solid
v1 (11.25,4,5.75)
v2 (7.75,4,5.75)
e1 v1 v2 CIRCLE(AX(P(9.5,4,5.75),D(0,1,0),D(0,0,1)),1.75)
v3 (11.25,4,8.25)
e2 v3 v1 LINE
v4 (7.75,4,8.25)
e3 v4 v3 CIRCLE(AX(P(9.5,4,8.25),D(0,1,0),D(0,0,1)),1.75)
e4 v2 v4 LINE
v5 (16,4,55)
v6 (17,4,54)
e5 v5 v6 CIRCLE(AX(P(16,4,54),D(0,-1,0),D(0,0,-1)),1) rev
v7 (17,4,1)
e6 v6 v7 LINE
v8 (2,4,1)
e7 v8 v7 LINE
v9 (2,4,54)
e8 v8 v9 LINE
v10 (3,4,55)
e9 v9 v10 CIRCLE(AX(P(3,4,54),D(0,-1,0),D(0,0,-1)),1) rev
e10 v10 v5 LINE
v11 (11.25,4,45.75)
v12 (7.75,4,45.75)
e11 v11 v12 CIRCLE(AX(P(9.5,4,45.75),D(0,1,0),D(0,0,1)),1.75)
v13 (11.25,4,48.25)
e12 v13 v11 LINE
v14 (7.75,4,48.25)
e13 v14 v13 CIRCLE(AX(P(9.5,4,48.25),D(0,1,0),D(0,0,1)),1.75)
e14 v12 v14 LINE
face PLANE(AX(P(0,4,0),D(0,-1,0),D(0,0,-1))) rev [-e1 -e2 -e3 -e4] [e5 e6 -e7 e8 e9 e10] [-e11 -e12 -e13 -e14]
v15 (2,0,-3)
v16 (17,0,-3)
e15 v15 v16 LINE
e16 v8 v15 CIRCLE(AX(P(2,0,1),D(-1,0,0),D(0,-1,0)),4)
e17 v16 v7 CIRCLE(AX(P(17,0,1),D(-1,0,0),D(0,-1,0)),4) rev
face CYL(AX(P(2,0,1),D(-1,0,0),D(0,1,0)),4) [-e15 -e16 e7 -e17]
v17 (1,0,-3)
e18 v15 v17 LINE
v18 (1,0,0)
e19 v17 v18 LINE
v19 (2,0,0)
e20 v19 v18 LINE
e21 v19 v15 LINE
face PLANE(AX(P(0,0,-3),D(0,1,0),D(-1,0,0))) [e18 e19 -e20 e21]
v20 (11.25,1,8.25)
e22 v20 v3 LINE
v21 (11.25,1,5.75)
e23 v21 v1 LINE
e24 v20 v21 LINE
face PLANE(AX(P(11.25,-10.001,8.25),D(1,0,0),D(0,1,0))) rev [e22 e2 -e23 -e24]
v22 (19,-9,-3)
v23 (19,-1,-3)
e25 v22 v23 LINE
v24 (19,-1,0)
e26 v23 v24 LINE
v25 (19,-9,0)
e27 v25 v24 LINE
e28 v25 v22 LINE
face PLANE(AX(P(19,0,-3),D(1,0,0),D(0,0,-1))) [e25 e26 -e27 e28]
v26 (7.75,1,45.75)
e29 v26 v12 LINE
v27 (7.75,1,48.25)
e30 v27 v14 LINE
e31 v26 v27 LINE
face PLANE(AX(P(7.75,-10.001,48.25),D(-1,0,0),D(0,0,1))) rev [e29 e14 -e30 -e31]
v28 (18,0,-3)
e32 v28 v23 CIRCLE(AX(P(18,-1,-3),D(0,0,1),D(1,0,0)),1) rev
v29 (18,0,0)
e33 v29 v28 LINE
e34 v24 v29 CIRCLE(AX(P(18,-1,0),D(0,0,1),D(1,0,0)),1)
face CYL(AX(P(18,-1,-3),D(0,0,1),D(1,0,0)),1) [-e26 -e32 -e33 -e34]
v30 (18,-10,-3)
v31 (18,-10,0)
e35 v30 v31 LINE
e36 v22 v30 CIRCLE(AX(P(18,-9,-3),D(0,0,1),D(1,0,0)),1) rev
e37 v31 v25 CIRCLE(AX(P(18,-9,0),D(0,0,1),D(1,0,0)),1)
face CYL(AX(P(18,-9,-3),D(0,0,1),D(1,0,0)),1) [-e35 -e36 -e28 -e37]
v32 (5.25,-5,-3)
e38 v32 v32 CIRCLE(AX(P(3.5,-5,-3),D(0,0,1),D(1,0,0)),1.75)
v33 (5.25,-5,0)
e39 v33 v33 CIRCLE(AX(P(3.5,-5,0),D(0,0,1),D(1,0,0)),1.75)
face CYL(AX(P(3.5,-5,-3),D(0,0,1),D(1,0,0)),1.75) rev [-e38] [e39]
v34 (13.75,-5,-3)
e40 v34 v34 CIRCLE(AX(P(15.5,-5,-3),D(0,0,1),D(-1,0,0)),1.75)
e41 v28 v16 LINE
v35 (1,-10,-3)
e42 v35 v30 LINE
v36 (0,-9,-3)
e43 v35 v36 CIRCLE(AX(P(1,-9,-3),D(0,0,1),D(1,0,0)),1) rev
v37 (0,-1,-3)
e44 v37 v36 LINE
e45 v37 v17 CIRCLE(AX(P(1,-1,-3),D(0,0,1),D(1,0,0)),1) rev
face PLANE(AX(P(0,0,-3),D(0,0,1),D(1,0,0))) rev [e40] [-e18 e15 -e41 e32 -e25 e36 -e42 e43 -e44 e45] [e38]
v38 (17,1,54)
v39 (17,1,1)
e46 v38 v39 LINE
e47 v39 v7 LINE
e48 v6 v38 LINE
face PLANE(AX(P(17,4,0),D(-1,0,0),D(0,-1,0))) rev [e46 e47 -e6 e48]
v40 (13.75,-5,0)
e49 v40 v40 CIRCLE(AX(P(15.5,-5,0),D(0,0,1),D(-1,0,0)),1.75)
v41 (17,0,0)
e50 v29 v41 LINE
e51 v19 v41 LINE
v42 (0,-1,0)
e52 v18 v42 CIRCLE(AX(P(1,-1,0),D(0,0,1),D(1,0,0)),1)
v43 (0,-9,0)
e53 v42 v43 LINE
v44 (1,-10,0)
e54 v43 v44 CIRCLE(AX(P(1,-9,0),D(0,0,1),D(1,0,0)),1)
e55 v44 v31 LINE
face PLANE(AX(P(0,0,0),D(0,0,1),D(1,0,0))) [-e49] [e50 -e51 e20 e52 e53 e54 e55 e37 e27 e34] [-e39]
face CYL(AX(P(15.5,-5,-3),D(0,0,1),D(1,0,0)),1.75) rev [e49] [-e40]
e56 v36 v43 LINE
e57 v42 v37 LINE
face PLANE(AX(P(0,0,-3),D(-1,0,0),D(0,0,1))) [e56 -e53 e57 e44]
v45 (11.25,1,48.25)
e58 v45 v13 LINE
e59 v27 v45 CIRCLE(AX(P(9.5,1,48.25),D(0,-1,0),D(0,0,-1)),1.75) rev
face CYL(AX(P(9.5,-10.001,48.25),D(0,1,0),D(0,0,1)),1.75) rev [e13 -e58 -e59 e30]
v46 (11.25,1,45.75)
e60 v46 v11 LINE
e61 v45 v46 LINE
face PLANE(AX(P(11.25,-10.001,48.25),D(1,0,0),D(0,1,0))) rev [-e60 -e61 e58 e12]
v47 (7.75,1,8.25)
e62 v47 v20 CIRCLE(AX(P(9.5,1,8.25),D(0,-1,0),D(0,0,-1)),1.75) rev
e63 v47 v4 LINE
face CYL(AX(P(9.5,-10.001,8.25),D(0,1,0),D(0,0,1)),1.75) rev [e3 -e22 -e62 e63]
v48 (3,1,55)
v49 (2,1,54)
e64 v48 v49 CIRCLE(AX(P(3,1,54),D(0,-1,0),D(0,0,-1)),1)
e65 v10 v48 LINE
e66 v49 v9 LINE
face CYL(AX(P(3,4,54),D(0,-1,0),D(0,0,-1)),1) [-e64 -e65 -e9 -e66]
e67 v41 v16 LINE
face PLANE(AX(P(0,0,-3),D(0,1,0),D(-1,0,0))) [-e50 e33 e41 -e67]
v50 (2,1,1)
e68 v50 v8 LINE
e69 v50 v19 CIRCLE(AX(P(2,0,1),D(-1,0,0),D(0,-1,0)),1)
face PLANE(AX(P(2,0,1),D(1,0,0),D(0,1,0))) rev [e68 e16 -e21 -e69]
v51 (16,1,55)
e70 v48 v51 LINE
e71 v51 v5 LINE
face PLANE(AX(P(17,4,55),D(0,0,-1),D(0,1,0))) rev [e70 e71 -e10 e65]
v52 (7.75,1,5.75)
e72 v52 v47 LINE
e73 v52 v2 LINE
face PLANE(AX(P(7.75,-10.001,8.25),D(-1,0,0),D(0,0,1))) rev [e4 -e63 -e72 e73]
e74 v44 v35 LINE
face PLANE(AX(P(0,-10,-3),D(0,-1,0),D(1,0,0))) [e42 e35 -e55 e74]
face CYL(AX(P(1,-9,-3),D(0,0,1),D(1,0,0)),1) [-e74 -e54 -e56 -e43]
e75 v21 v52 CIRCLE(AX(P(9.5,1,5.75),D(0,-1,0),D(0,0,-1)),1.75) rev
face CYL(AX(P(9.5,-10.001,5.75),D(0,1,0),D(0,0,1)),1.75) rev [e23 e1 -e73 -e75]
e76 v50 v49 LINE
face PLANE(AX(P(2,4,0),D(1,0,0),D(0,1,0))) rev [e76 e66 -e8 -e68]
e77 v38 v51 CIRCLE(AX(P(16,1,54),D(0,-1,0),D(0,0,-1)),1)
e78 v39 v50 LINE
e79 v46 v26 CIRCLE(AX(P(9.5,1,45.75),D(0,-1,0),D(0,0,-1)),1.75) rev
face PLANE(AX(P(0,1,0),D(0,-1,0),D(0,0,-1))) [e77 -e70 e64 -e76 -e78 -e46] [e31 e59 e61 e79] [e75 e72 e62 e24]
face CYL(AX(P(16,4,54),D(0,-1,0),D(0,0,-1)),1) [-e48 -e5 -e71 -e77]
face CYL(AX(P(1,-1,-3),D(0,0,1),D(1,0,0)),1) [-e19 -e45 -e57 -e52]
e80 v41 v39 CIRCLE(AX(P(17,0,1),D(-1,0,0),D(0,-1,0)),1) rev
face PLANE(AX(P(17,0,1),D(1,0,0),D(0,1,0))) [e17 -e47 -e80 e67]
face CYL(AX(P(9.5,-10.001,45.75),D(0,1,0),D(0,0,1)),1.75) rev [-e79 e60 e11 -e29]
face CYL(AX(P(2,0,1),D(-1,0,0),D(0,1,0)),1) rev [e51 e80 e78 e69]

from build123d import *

# Parameters (mm, degrees)
CROQUIS1_W             = 19
CROQUIS1_H             = 10
CROQUIS1_R             = 1.75
BRIDA_BASE1_DEPTH      = 3
BRIDA_DE_ARISTA1_DEPTH = 15
CORTAR_EXTRUIR1_REACH  = 61.85
REDONDEO1_R            = 1


# Sheet-metal steps are written as plain solids
with BuildPart() as part:
    # Croquis1 → Brida base1 (new body)
    with BuildSketch(Plane.XY):
        with Locations((9.5, -5)):
            Rectangle(CROQUIS1_W, CROQUIS1_H)
        with Locations((3.5, -5)):
            Circle(CROQUIS1_R, mode=Mode.SUBTRACT)
        with Locations(Location((15.5, -5, 0), (0, 0, 180))):
            Circle(CROQUIS1_R, mode=Mode.SUBTRACT)
    extrude(amount=-BRIDA_BASE1_DEPTH)

    # Brida de arista1 section (across the edge) → Brida de arista1 (add)
    with BuildSketch(Plane(origin=(17, 1, 0), x_dir=(0, -1, 0), z_dir=(-1, 0, 0))):
        with BuildLine():
            Line((-3, 1), (-3, 55))
            Line((-3, 55), (0, 55))
            Line((0, 55), (0, 1))
            ThreePointArc((0, 1), (0.292893219, 0.292893219), (1, 0))
            Line((1, 0), (1, -3))
            ThreePointArc((1, -3), (-1.828427125, -1.828427125), (-3, 1))
        make_face()
    extrude(amount=BRIDA_DE_ARISTA1_DEPTH)

    # Croquis9 → Cortar-Extruir1 (cut, up to next)
    with BuildSketch(Plane(origin=(0, 4, 0), x_dir=(1, 0, 0), z_dir=(0, 1, 0)), mode=Mode.PRIVATE) as cortar_extruir1_sk1:
        with BuildLine():
            Line((7.75, -8.25), (7.75, -5.75))
            ThreePointArc((7.75, -5.75), (9.5, -4), (11.25, -5.75))
            Line((11.25, -5.75), (11.25, -8.25))
            ThreePointArc((11.25, -8.25), (9.5, -10), (7.75, -8.25))
        make_face()
    cortar_extruir1_tool1 = extrude(cortar_extruir1_sk1.sketch, amount=-CORTAR_EXTRUIR1_REACH, mode=Mode.PRIVATE) & part.part
    # Croquis9 → Cortar-Extruir1 (cut, up to next)
    with BuildSketch(Plane(origin=(0, 4, 0), x_dir=(1, 0, 0), z_dir=(0, 1, 0)), mode=Mode.PRIVATE) as cortar_extruir1_sk2:
        with BuildLine():
            Line((7.75, -48.25), (7.75, -45.75))
            ThreePointArc((7.75, -45.75), (9.5, -44), (11.25, -45.75))
            Line((11.25, -45.75), (11.25, -48.25))
            ThreePointArc((11.25, -48.25), (9.5, -50), (7.75, -48.25))
        make_face()
    cortar_extruir1_tool2 = extrude(cortar_extruir1_sk2.sketch, amount=-CORTAR_EXTRUIR1_REACH, mode=Mode.PRIVATE) & part.part
    add(cortar_extruir1_tool1.solids().sort_by_distance((9.5, 4, 7))[0], mode=Mode.SUBTRACT)
    add(cortar_extruir1_tool2.solids().sort_by_distance((9.5, 4, 47))[0], mode=Mode.SUBTRACT)

    # Redondeo1
    redondeo1_edges = [part.edges().sort_by_distance(p)[0] for p in [
        (19, -10, -1.5),
        (0, -10, -1.5),
        (19, 0, -1.5),
        (0, 0, -1.5),
        (17, 2.5, 55),
        (2, 2.5, 55),
    ]]
    fillet(redondeo1_edges, radius=REDONDEO1_R)


solid = part.part
